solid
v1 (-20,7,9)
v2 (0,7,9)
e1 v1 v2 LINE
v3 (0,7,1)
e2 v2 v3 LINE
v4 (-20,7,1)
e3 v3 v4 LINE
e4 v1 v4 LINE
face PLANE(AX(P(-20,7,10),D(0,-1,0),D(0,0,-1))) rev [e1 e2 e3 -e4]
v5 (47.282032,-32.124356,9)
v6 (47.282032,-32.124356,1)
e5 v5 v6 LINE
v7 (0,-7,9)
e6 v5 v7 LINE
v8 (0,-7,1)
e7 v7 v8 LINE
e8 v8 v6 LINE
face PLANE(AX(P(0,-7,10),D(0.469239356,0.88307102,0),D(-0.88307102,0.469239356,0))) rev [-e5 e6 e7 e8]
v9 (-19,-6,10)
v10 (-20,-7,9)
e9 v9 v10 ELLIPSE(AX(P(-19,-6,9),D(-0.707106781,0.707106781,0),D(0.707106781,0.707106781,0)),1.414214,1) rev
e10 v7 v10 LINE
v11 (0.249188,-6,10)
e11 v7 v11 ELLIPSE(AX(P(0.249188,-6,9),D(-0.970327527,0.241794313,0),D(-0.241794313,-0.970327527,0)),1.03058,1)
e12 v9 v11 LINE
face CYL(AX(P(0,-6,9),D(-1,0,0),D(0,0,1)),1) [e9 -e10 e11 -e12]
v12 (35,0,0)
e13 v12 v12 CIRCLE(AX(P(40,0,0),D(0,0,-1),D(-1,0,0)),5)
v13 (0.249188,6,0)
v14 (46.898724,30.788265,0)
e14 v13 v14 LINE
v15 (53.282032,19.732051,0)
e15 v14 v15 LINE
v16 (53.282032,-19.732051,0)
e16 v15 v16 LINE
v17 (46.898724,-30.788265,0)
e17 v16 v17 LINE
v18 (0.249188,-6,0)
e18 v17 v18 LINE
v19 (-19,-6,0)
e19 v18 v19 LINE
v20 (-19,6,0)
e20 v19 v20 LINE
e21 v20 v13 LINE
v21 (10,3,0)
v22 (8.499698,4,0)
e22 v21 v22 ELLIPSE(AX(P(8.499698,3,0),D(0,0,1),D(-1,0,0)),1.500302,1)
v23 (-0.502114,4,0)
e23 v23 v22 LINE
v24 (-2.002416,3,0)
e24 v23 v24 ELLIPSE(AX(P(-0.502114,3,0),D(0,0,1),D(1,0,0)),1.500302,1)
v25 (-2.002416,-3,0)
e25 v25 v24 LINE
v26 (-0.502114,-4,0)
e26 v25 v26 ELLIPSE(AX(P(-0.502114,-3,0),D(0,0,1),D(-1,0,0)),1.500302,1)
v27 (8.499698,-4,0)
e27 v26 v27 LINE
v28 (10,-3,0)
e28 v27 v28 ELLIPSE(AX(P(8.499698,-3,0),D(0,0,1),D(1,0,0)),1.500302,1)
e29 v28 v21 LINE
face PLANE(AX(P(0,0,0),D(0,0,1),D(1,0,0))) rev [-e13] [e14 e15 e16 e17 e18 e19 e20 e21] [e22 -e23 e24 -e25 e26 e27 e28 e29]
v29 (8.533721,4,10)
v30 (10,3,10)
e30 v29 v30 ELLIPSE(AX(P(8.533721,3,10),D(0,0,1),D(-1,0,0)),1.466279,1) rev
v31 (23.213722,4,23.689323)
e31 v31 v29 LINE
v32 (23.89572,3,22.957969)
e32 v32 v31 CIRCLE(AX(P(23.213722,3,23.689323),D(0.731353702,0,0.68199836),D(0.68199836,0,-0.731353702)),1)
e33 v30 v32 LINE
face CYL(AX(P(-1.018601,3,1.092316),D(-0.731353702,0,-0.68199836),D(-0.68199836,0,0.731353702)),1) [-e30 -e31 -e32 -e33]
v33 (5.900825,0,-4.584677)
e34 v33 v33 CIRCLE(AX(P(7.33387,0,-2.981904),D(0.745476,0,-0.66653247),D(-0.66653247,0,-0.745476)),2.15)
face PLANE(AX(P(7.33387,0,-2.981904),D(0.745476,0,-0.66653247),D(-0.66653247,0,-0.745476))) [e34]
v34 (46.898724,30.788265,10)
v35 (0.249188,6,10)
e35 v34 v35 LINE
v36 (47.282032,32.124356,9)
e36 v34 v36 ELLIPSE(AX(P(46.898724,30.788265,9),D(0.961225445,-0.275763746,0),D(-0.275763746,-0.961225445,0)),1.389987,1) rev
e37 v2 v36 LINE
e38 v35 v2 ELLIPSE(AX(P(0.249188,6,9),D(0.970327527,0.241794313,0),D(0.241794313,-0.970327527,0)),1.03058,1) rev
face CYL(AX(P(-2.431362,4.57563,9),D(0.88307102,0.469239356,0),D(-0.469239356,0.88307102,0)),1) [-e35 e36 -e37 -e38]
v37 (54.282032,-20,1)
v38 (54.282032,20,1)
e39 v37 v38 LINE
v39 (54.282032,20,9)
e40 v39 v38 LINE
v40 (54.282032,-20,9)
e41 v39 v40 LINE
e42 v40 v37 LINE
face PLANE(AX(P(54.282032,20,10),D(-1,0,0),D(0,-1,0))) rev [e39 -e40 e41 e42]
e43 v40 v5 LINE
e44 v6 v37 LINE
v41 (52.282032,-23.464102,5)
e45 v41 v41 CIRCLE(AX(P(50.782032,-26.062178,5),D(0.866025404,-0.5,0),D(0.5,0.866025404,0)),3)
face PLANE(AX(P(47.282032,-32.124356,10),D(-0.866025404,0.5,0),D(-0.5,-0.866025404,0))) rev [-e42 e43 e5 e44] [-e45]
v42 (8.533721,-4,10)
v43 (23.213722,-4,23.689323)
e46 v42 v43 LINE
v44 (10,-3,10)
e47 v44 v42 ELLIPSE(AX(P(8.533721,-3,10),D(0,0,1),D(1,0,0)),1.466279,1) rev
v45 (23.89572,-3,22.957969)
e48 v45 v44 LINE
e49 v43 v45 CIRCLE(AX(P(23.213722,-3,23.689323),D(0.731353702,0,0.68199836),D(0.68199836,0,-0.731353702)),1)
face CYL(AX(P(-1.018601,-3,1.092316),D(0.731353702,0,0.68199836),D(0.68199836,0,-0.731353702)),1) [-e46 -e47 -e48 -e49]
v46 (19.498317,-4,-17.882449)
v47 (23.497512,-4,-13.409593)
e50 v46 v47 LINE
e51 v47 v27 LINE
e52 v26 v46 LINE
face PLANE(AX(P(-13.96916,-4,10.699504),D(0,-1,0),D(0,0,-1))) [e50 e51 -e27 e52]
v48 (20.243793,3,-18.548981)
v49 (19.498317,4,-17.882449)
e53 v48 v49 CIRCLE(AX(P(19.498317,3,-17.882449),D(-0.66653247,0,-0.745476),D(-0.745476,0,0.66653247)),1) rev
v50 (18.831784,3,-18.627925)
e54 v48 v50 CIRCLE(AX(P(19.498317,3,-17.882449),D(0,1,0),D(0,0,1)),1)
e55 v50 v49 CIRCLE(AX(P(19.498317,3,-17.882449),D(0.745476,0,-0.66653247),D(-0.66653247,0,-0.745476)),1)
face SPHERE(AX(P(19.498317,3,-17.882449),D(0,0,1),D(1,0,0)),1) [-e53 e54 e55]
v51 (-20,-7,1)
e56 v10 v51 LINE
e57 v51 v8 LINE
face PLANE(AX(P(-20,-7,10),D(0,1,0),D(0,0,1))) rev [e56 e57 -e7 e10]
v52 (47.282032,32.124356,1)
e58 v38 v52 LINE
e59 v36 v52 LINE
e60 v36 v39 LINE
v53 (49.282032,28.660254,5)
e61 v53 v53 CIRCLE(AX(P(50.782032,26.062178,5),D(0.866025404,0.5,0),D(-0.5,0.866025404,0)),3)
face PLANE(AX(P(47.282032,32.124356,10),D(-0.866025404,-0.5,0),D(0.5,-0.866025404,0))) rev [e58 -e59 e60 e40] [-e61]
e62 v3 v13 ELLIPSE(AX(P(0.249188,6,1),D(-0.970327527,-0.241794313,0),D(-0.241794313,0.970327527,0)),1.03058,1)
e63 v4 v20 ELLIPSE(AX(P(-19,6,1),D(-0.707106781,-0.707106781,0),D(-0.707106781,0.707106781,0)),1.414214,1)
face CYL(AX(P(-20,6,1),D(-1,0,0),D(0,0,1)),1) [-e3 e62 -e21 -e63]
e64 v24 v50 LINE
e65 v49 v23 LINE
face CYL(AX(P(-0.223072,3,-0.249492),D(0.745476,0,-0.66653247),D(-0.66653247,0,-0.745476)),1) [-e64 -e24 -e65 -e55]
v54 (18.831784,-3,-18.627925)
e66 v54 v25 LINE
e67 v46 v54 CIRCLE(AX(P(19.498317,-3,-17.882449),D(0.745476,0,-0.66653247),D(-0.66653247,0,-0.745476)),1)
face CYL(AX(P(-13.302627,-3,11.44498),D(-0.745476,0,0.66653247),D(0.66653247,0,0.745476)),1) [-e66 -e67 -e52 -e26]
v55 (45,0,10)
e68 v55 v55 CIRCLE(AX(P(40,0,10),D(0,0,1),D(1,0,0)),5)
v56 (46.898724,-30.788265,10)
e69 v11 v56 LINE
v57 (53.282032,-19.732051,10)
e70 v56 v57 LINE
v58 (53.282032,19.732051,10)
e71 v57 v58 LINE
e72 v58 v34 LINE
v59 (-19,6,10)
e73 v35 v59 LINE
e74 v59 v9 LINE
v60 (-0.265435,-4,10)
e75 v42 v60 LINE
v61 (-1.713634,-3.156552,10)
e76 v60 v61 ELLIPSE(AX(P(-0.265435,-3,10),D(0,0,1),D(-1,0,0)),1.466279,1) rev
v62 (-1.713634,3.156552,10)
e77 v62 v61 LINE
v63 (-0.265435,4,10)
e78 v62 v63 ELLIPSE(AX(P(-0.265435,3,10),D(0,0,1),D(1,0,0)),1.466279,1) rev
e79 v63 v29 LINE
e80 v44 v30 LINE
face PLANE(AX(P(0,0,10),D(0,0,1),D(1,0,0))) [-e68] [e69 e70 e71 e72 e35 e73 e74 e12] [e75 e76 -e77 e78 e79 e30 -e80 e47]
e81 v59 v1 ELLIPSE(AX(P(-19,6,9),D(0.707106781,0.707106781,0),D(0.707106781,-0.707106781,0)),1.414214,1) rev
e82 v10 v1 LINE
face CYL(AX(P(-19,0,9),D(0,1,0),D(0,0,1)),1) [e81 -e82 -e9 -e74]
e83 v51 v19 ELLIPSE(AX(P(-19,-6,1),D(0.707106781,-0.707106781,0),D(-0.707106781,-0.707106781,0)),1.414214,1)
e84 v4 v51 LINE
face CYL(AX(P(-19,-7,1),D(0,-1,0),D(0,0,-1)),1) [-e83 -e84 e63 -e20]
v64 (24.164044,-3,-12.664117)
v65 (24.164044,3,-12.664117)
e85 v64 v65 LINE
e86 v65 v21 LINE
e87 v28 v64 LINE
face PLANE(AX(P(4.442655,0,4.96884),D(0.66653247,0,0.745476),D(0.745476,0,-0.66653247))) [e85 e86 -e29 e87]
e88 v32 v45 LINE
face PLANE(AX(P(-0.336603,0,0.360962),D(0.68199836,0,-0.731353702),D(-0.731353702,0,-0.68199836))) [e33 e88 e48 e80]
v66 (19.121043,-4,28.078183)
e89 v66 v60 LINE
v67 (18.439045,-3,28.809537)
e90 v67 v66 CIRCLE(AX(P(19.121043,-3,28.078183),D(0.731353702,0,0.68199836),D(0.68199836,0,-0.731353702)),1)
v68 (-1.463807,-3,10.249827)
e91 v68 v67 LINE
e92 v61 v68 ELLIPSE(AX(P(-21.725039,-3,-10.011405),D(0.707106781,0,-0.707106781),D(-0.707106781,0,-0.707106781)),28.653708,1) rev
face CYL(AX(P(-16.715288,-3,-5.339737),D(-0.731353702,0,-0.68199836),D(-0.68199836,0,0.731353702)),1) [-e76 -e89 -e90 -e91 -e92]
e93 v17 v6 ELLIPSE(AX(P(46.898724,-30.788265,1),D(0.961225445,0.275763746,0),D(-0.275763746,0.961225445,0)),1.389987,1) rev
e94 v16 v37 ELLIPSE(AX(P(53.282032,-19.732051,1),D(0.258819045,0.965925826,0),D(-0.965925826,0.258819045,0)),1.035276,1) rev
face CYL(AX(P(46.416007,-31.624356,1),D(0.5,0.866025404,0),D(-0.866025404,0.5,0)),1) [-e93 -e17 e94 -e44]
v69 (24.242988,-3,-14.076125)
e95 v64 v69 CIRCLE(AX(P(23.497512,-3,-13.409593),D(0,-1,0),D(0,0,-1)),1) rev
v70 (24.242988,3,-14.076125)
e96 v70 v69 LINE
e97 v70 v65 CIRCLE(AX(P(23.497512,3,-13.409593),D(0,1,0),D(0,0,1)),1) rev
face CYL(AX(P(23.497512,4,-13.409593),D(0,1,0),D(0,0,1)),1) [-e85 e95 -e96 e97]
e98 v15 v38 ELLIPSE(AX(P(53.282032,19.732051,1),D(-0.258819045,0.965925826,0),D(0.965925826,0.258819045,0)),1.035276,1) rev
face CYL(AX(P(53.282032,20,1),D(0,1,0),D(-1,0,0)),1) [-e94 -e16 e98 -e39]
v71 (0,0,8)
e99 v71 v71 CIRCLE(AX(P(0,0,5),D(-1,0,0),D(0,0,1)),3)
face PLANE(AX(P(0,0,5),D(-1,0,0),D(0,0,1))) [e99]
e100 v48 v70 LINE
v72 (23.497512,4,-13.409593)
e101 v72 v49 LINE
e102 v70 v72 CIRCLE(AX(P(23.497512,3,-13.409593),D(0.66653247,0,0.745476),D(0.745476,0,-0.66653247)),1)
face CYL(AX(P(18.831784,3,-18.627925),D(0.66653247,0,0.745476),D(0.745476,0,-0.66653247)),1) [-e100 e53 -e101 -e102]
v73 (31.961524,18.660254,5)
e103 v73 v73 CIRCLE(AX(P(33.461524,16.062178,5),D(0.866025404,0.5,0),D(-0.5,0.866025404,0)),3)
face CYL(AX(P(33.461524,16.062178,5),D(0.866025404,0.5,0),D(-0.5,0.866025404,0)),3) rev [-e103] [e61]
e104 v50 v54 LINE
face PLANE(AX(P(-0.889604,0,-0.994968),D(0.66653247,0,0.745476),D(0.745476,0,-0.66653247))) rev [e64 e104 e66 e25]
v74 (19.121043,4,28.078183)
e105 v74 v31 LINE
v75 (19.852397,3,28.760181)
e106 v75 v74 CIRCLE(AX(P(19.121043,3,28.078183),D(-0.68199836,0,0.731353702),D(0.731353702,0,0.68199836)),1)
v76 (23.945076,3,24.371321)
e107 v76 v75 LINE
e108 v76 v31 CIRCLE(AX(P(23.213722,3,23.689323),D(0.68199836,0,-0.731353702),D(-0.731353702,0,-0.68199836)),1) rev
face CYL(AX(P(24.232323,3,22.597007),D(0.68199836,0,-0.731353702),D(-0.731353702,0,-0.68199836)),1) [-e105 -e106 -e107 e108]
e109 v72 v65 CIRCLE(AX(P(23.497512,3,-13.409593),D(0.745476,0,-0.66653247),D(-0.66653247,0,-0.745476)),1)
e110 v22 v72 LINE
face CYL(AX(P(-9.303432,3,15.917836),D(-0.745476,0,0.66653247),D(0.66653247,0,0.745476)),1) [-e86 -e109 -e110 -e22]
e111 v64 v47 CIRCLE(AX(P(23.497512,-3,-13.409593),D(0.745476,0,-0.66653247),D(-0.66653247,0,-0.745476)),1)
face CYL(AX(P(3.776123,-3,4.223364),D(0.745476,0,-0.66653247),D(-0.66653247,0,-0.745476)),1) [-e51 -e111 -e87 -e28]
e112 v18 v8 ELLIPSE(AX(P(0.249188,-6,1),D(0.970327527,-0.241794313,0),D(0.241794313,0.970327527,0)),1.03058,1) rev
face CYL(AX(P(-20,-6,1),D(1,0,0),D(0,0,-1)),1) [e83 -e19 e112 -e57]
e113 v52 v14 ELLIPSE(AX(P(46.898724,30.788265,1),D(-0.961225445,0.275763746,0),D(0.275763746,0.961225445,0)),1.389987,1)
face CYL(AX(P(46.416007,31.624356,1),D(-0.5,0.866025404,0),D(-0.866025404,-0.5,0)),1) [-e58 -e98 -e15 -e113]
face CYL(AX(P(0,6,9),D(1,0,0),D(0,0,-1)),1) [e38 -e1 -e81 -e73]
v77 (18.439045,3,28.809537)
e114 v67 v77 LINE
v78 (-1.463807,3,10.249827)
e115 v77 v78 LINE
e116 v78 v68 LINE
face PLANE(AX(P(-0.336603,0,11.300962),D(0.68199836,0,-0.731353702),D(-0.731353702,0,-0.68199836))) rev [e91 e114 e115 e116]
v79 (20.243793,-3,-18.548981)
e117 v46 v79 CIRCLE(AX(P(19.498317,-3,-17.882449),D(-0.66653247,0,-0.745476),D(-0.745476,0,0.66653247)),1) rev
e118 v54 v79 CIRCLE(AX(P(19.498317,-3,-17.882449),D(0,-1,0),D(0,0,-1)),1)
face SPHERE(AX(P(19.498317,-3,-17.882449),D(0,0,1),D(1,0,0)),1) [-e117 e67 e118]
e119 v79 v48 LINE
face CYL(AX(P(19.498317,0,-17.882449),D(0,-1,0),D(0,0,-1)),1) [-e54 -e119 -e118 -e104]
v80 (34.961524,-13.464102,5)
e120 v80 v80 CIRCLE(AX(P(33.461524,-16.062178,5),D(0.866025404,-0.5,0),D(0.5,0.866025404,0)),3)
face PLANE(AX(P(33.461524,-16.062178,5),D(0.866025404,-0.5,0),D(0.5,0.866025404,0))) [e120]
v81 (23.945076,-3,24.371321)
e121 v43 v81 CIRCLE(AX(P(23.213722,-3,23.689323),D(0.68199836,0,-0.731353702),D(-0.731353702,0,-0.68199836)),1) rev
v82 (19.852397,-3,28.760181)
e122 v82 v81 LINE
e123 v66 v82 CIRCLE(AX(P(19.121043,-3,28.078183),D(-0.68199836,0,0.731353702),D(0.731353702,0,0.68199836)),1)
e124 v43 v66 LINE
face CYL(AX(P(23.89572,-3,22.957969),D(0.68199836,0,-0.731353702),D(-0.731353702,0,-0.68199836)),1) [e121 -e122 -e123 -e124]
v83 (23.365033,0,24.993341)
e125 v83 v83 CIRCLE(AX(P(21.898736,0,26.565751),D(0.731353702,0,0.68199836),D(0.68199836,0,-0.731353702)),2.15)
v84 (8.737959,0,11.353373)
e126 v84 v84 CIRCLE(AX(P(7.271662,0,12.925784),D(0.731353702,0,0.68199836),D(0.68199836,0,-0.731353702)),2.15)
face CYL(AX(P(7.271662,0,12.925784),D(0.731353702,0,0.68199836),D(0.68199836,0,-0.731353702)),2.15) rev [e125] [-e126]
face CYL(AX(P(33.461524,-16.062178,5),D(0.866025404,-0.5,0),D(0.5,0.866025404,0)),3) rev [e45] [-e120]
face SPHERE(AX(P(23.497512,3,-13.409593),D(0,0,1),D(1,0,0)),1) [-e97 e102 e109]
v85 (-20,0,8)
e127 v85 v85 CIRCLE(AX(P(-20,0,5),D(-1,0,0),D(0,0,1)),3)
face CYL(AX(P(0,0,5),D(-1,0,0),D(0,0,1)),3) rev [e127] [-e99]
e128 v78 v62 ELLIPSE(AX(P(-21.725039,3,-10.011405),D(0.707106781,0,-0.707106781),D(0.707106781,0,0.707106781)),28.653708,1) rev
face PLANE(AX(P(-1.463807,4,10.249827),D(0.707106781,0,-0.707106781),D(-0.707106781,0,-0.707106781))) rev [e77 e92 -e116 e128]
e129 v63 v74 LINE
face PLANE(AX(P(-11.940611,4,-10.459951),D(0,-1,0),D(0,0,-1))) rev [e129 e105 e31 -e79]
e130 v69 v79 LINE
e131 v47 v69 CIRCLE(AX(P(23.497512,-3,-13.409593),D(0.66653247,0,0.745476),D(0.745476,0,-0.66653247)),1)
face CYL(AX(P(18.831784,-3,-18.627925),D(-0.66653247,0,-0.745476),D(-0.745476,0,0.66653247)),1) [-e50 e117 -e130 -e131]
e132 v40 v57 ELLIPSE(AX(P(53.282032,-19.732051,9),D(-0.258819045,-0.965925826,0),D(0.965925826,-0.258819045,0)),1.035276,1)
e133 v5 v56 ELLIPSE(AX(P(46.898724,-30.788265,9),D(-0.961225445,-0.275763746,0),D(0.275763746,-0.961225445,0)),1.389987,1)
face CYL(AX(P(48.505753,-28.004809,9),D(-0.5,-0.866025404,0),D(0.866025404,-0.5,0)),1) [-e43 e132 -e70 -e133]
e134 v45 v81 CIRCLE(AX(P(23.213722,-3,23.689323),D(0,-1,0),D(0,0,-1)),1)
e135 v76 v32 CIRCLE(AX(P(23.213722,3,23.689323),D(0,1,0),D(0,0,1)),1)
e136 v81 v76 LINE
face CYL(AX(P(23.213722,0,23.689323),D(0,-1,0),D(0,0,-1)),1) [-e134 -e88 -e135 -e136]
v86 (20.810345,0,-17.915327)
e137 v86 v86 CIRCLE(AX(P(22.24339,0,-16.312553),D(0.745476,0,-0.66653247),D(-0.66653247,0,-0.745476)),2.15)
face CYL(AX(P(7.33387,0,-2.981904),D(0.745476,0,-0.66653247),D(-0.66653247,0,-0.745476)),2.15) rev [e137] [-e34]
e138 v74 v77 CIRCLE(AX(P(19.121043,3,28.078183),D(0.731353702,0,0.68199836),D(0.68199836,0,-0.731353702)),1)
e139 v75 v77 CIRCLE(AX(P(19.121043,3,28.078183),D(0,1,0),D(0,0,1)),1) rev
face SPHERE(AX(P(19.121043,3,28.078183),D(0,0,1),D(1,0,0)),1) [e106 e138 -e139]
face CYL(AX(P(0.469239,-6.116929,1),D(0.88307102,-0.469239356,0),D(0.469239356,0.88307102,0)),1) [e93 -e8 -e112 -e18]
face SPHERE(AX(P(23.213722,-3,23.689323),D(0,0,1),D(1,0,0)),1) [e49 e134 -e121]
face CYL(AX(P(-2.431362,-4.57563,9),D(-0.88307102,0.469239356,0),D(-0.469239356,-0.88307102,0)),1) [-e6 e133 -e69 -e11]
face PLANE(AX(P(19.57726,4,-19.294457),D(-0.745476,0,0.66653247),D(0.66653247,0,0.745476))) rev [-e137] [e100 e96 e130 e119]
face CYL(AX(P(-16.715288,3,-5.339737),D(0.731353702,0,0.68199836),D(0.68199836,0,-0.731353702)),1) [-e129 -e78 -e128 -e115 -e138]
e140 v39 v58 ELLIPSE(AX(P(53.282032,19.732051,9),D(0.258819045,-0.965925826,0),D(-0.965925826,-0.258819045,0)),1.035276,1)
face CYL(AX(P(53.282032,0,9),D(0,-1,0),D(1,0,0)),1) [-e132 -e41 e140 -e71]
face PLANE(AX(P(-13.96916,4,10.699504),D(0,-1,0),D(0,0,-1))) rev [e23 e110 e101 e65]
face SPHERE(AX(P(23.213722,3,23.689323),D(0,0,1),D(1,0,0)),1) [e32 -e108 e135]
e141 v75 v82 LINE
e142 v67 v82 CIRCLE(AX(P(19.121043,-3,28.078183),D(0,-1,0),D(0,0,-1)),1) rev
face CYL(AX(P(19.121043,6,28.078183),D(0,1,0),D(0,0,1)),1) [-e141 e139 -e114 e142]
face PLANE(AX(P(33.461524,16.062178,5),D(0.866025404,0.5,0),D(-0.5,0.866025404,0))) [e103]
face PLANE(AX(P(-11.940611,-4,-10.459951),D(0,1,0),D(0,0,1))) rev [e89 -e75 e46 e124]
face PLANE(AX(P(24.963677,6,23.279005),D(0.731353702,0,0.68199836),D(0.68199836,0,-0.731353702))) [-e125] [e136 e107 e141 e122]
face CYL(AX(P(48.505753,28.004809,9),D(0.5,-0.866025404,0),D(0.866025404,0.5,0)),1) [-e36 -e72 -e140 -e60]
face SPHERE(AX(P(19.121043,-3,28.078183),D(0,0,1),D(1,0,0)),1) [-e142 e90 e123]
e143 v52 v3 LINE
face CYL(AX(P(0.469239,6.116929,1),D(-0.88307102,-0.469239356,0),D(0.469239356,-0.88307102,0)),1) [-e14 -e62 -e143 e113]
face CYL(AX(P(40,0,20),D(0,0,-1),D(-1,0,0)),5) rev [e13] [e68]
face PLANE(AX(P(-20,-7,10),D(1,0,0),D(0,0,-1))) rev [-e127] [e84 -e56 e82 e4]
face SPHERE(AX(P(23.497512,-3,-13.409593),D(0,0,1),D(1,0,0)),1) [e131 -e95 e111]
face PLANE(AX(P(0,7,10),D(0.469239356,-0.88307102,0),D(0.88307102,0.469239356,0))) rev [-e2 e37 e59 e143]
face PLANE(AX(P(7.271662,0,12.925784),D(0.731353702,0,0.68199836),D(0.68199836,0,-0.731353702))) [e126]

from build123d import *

# Parameters (mm, degrees)
BOSS_EXTRU_2_DEPTH       = 10
ESQUISSE6_R              = 3
ENL_V_MAT_EXTRU_4_DEPTH  = 20
ESQUISSE7_R              = 3
ENL_V_MAT_EXTRU_5_DEPTH  = 20
ESQUISSE8_R              = 5
ENL_V_MAT_EXTRU_6_DEPTH  = 20
BOSS_EXTRU_3_DEPTH       = 10.94
ENL_V_MAT_EXTRU_9_DEPTH  = 10
ESQUISSE14_W             = 21.055359181
ESQUISSE14_H             = 15.627906255
ENL_V_MAT_EXTRU_10_DEPTH = 10
ESQUISSE15_R             = 2.15
ENL_V_MAT_EXTRU_11_DEPTH = 20
ESQUISSE19_W             = 45
ESQUISSE19_H             = 8
BOSS_EXTRU_6_DEPTH       = 8
ENL_V_MAT_EXTRU_13_DEPTH = 8
ESQUISSE21_R             = 2.15
ENL_V_MAT_EXTRU_14_DEPTH = 20
ESQUISSE4_R              = 3
ENL_V_MAT_EXTRU_3_DEPTH  = 20
CONG_1_R                 = 1
CONG_2_R                 = 1


with BuildPart() as part:
    # Esquisse1 → Boss.-Extru.2 (new body)
    with BuildSketch(Plane.XY):
        Polygon((-20, -7), (-20, 7), (0, 7), (47.282032303, 32.124355653), (54.282032303, 20), (54.282032303, -20), (47.282032303, -32.124355653), (0, -7), align=None)
    extrude(amount=BOSS_EXTRU_2_DEPTH)

    # Esquisse6 → Enlèv. mat.-Extru.4 (cut)
    with BuildSketch(Plane(origin=(49.371778265, 28.504809472, 0), x_dir=(0.4999999999999953, -0.8660254037844415, 0), z_dir=(0.8660254037844415, 0.4999999999999953, 0))):
        with Locations(Location((2.820508076, -5, 0), (0, 0, 180))):
            Circle(ESQUISSE6_R)
    extrude(amount=-ENL_V_MAT_EXTRU_4_DEPTH, mode=Mode.SUBTRACT)

    # Esquisse7 → Enlèv. mat.-Extru.5 (cut)
    with BuildSketch(Plane(origin=(49.371778265, -28.504809472, 0), x_dir=(-0.5000000000000256, -0.8660254037844237, 0), z_dir=(0.8660254037844238, -0.5000000000000258, 0))):
        with Locations(Location((-2.820508076, -5, 0), (0, 0, 180))):
            Circle(ESQUISSE7_R)
    extrude(amount=-ENL_V_MAT_EXTRU_5_DEPTH, mode=Mode.SUBTRACT)

    # Esquisse8 → Enlèv. mat.-Extru.6 (cut)
    with BuildSketch(Plane(origin=(0, 0, 0), x_dir=(-1, 0, 0), z_dir=(0, 0, -1))):
        with Locations((-40, 0)):
            Circle(ESQUISSE8_R)
    extrude(amount=-ENL_V_MAT_EXTRU_6_DEPTH, mode=Mode.SUBTRACT)

    # Esquisse3D2 → Boss.-Extru.3 (add, along a direction that is not the sketch's normal)
    with BuildSketch(Plane(origin=(-11.940611049, 4, -10.459950802), x_dir=(0.7221683612814543, -0.15799050110667315, 0.6734328916262713), z_dir=(-0.6819983600624996, 0, 0.7313537016191696))):
        Polygon((0, 0), (49.372031596, 7.899525055), (50.635955605, 0), (1.263924009, -7.899525055), align=None)
    extrude(amount=BOSS_EXTRU_3_DEPTH, dir=(0, 0, 1))

    # Esquisse11 → Enlèv. mat.-Extru.9 (cut)
    with BuildSketch(Plane(origin=(0, -4, 0), x_dir=(-1, 0, 0), z_dir=(0, -1, 0))):
        Polygon((-19.170398677, -29.491535113), (-24.627074032, -23.639967201), (-24.627074032, -34.579967201), (-21.088649198, -31.280332662), align=None)
    extrude(amount=-ENL_V_MAT_EXTRU_9_DEPTH, mode=Mode.SUBTRACT)

    # Esquisse14 → Enlèv. mat.-Extru.10 (cut)
    with BuildSketch(Plane(origin=(0, -4, 0), x_dir=(-1, 0, 0), z_dir=(0, -1, 0))):
        with Locations((1.412931459, 7.813953128)):
            Rectangle(ESQUISSE14_W, ESQUISSE14_H)
    extrude(amount=-ENL_V_MAT_EXTRU_10_DEPTH, mode=Mode.SUBTRACT)

    # Esquisse15 → Enlèv. mat.-Extru.11 (cut)
    with BuildSketch(Plane(origin=(24.963676652, 0, 23.279005084), x_dir=(0.6819983600624997, 0, -0.7313537016191695), z_dir=(0.7313537016191695, 0, 0.6819983600624997))):
        with Locations((-4.494058163, 0)):
            Circle(ESQUISSE15_R)
    extrude(amount=-ENL_V_MAT_EXTRU_11_DEPTH, mode=Mode.SUBTRACT)

    # Esquisse19 → Boss.-Extru.6 (add)
    with BuildSketch(Plane(origin=(4.442655339, 0, 4.968839596), x_dir=(-0.7454759996828609, 0, 0.6665324702494538), z_dir=(-0.6665324702494538, 0, -0.7454759996828609))):
        with Locations((-4.954759997, 0)):
            Rectangle(ESQUISSE19_W, ESQUISSE19_H)
    extrude(amount=BOSS_EXTRU_6_DEPTH)

    # Esquisse20 → Enlèv. mat.-Extru.13 (cut)
    with BuildSketch(Plane(origin=(0, -4, 0), x_dir=(-1, 0, 0), z_dir=(0, -1, 0))):
        Polygon((8.636899992, -16.663311756), (13.969159754, -10.699503759), (13.186807375, -10), (1.71363405, -10), (1.463807332, -10.249826718), align=None)
    extrude(amount=-ENL_V_MAT_EXTRU_13_DEPTH, mode=Mode.SUBTRACT)

    # Esquisse21 → Enlèv. mat.-Extru.14 (cut)
    with BuildSketch(Plane(origin=(20.466864655, 0, -18.299489001), x_dir=(-0.6665324702494541, 0, -0.7454759996828608), z_dir=(0.7454759996828608, 0, -0.6665324702494541))):
        with Locations((-2.665324702, 0)):
            Circle(ESQUISSE21_R)
    extrude(amount=-ENL_V_MAT_EXTRU_14_DEPTH, mode=Mode.SUBTRACT)

    # Esquisse4 → Enlèv. mat.-Extru.3 (cut)
    with BuildSketch(Plane.ZY.offset(20)):
        with Locations((5, 0)):
            Circle(ESQUISSE4_R)
    extrude(amount=-ENL_V_MAT_EXTRU_3_DEPTH, mode=Mode.SUBTRACT)

    # Congé1
    # the kernel refuses this fillet: 1 mm, written as the material it takes off along each edge
    with BuildSketch(Plane(origin=(23.497511524, 3, -13.409592934), x_dir=(0, 1, 0), z_dir=(0.666532470249454, 0, 0.745475999682861))) as cong_1_piece_1_section:
        Polygon((0, 0), (CONG_1_R, 0), (CONG_1_R, -CONG_1_R), (0, -CONG_1_R), align=None)
    cong_1_piece_1 = extrude(amount=CONG_1_R, mode=Mode.PRIVATE)
    cong_1_piece_1 = cong_1_piece_1 - Plane(origin=(23.497511524, 3, -13.409592934), x_dir=(-0.5271311345875715, -0.7071067811865474, 0.4713096295944097), z_dir=(0.666532470249454, 0, 0.745475999682861)) * Sphere(CONG_1_R, mode=Mode.PRIVATE)
    add(cong_1_piece_1, mode=Mode.SUBTRACT)
    with BuildSketch(Plane(origin=(23.497511524, -3, -13.409592934), x_dir=(0, -1, 0), z_dir=(0.666532470249454, 0, 0.745475999682861))) as cong_1_piece_2_section:
        Polygon((0, 0), (CONG_1_R, 0), (CONG_1_R, CONG_1_R), (0, CONG_1_R), align=None)
    cong_1_piece_2 = extrude(amount=CONG_1_R, mode=Mode.PRIVATE)
    cong_1_piece_2 = cong_1_piece_2 - Plane(origin=(23.497511524, -3, -13.409592934), x_dir=(-0.5271311345875714, 0.7071067811865476, 0.4713096295944094), z_dir=(0.666532470249454, 0, 0.745475999682861)) * Sphere(CONG_1_R, mode=Mode.PRIVATE)
    add(cong_1_piece_2, mode=Mode.SUBTRACT)
    with BuildSketch(Plane(origin=(19.498316702, 3, -17.882448933), x_dir=(-0.666532470249454, 0, -0.745475999682861), z_dir=(0.7454759996828609, 0, -0.6665324702494538))) as cong_1_piece_3_section:
        Polygon((0, 0), (CONG_1_R, 0), (CONG_1_R, CONG_1_R), (0, CONG_1_R), align=None)
    cong_1_piece_3 = extrude(amount=CONG_1_R, mode=Mode.PRIVATE)
    cong_1_piece_3 = cong_1_piece_3 - Plane(origin=(19.498316702, 3, -17.882448933), x_dir=(0.47130962959440953, -0.7071067811865474, 0.5271311345875718), z_dir=(0.7454759996828609, 0, -0.6665324702494538)) * Sphere(CONG_1_R, mode=Mode.PRIVATE)
    add(cong_1_piece_3, mode=Mode.SUBTRACT)
    with BuildSketch(Plane(origin=(19.498316702, -3, -17.882448933), x_dir=(-0.666532470249454, 0, -0.745475999682861), z_dir=(0, -1, 0))) as cong_1_piece_4_section:
        Polygon((0, 0), (CONG_1_R, 0), (CONG_1_R, CONG_1_R), (0, CONG_1_R), align=None)
    cong_1_piece_4 = extrude(amount=CONG_1_R, mode=Mode.PRIVATE)
    cong_1_piece_4 = cong_1_piece_4 - Plane(origin=(19.498316702, -3, -17.882448933), x_dir=(-0.05582150499316189, 0, 0.9984407641819811), z_dir=(0, -1, 0)) * Sphere(CONG_1_R, mode=Mode.PRIVATE)
    add(cong_1_piece_4, mode=Mode.SUBTRACT)
    with BuildSketch(Plane(origin=(19.121043336, -3, 28.078183051), x_dir=(-0.6819983600624996, 0, 0.7313537016191696), z_dir=(0.7313537016191692, 0, 0.6819983600624999))) as cong_1_piece_5_section:
        Polygon((0, 0), (CONG_1_R, 0), (CONG_1_R, CONG_1_R), (0, CONG_1_R), align=None)
    cong_1_piece_5 = extrude(amount=CONG_1_R, mode=Mode.PRIVATE)
    cong_1_piece_5 = cong_1_piece_5 - Plane(origin=(19.121043336, -3, 28.078183051), x_dir=(0.482245665158298, 0.7071067811865476, -0.5171451618607975), z_dir=(0.7313537016191692, 0, 0.6819983600624999)) * Sphere(CONG_1_R, mode=Mode.PRIVATE)
    add(cong_1_piece_5, mode=Mode.SUBTRACT)
    with BuildSketch(Plane(origin=(19.121043336, 3, 28.078183051), x_dir=(-0.6819983600624996, 0, 0.7313537016191696), z_dir=(0.7313537016191692, 0, 0.6819983600624999))) as cong_1_piece_6_section:
        Polygon((0, 0), (CONG_1_R, 0), (CONG_1_R, -CONG_1_R), (0, -CONG_1_R), align=None)
    cong_1_piece_6 = extrude(amount=CONG_1_R, mode=Mode.PRIVATE)
    cong_1_piece_6 = cong_1_piece_6 - Plane(origin=(19.121043336, 3, 28.078183051), x_dir=(0.4822456651582982, -0.7071067811865472, -0.5171451618607977), z_dir=(0.7313537016191692, 0, 0.6819983600624999)) * Sphere(CONG_1_R, mode=Mode.PRIVATE)
    add(cong_1_piece_6, mode=Mode.SUBTRACT)
    with BuildSketch(Plane(origin=(23.213721971, -3, 23.689322543), x_dir=(0.6819983600624996, 0, -0.7313537016191696), z_dir=(0.7313537016191692, 0, 0.6819983600624999))) as cong_1_piece_7_section:
        Polygon((0, 0), (CONG_1_R, 0), (CONG_1_R, -CONG_1_R), (0, -CONG_1_R), align=None)
    cong_1_piece_7 = extrude(amount=CONG_1_R, mode=Mode.PRIVATE)
    cong_1_piece_7 = cong_1_piece_7 - Plane(origin=(23.213721971, -3, 23.689322543), x_dir=(-0.4822456651582982, 0.7071067811865472, 0.5171451618607977), z_dir=(0.7313537016191692, 0, 0.6819983600624999)) * Sphere(CONG_1_R, mode=Mode.PRIVATE)
    add(cong_1_piece_7, mode=Mode.SUBTRACT)
    with BuildSketch(Plane(origin=(23.213721971, 3, 23.689322543), x_dir=(0.7313537016191692, 0, 0.6819983600624999), z_dir=(0.6819983600624996, 0, -0.7313537016191696))) as cong_1_piece_8_section:
        Polygon((0, 0), (CONG_1_R, 0), (CONG_1_R, -CONG_1_R), (0, -CONG_1_R), align=None)
    cong_1_piece_8 = extrude(amount=CONG_1_R, mode=Mode.PRIVATE)
    cong_1_piece_8 = cong_1_piece_8 - Plane(origin=(23.213721971, 3, 23.689322543), x_dir=(-0.5171451618607974, -0.7071067811865475, -0.48224566515829836), z_dir=(0.6819983600624996, 0, -0.7313537016191696)) * Sphere(CONG_1_R, mode=Mode.PRIVATE)
    add(cong_1_piece_8, mode=Mode.SUBTRACT)
    with BuildSketch(Plane(origin=(24.909519994, 3, -13.330649405), x_dir=(-0.7454759996828614, 0, 0.6665324702494536), z_dir=(0, -1, 0)), Plane(origin=(24.242987523, -4, -14.076125405), x_dir=(-0.7454759996828609, 0, 0.666532470249454), z_dir=(-0.666532470249454, 0, -0.745475999682861)), Plane(origin=(19.170398677, -3, 29.491535113), x_dir=(0.6819983600624999, 0, -0.7313537016191692), z_dir=(0, 1, 0))) as cong_1_piece_9:
        with BuildLine():
            CenterArc((CONG_1_R, CONG_1_R), CONG_1_R, 180, 90)
            Line((0, CONG_1_R), (0, 0))
            Line((0, 0), (CONG_1_R, 0))
        make_face()
    extrude(amount=6, mode=Mode.SUBTRACT)
    with BuildSketch(Plane(origin=(24.242987523, 4, -14.076125405), x_dir=(-0.745475999682861, 0, 0.6665324702494538), z_dir=(-0.666532470249454, 0, -0.745475999682861)), Plane(origin=(19.577260232, 3, -19.294457402), x_dir=(-0.7454759996828622, 0, 0.6665324702494525), z_dir=(0, -1, 0)), Plane(origin=(24.627074032, 3, 23.639967201), x_dir=(-0.7313537016191676, 0, -0.6819983600625017), z_dir=(0, -1, 0))) as cong_1_piece_10:
        with BuildLine():
            CenterArc((CONG_1_R, -CONG_1_R), CONG_1_R, 90, 90)
            Line((0, -CONG_1_R), (0, 0))
            Line((0, 0), (CONG_1_R, 0))
        make_face()
    extrude(amount=6, mode=Mode.SUBTRACT)
    with BuildSketch(Plane(origin=(19.852397038, -4, 28.760181411), x_dir=(-0.7313537016191692, 0, -0.6819983600624998), z_dir=(0.6819983600624999, 0, -0.7313537016191692)), Plane(origin=(23.945075672, 4, 24.371320903), x_dir=(-0.7313537016191692, 0, -0.6819983600624999), z_dir=(-0.6819983600624999, 0, 0.7313537016191692))) as cong_1_piece_11:
        with BuildLine():
            CenterArc((CONG_1_R, CONG_1_R), CONG_1_R, 180, 90)
            Line((0, CONG_1_R), (0, 0))
            Line((0, 0), (CONG_1_R, 0))
        make_face()
    extrude(amount=6.001009496, mode=Mode.SUBTRACT)
    with BuildSketch(Plane(origin=(23.895720331, -4, 22.957968841), x_dir=(0, 1, 0), z_dir=(-0.7313537016191696, 0, -0.6819983600624996))) as cong_1_piece_12_section:
        with BuildLine():
            CenterArc((CONG_1_R, -CONG_1_R), CONG_1_R, 90, 90)
            Line((0, -CONG_1_R), (0, 0))
            Line((0, 0), (CONG_1_R, 0))
        make_face()
    cong_1_piece_12 = extrude(amount=21.5, mode=Mode.PRIVATE)
    cong_1_piece_12 = split(cong_1_piece_12, bisect_by=Plane(origin=(16.701898304, -3.775135003, 10), z_dir=(0, 0, 1)), keep=Keep.TOP, mode=Mode.PRIVATE)
    add(cong_1_piece_12, mode=Mode.SUBTRACT)
    with BuildSketch(Plane(origin=(18.439044976, -4, 28.809536753), x_dir=(0.6819983600624996, -1.776356839400248e-15, -0.7313537016191696), z_dir=(-0.7313537016191696, 0, -0.6819983600624996))) as cong_1_piece_13_section:
        with BuildLine():
            CenterArc((CONG_1_R, -CONG_1_R), CONG_1_R, 90, 90)
            Line((0, -CONG_1_R), (0, 0))
            Line((0, 0), (CONG_1_R, 0))
        make_face()
    cong_1_piece_13 = extrude(amount=29.713716515, mode=Mode.PRIVATE)
    cong_1_piece_13 = split(cong_1_piece_13, bisect_by=Plane(origin=(8.594887091, -3.772527831, 10), z_dir=(0, 0, 1)), keep=Keep.TOP, mode=Mode.PRIVATE)
    add(cong_1_piece_13, mode=Mode.SUBTRACT)
    with BuildSketch(Plane(origin=(-3.292191586, 4, 8.544830818), x_dir=(0.6819983600624996, 0, -0.7313537016191696), z_dir=(0.7313537016191696, 0, 0.6819983600624996))) as cong_1_piece_14_section:
        with BuildLine():
            CenterArc((CONG_1_R, -CONG_1_R), CONG_1_R, 90, 90)
            Line((0, -CONG_1_R), (0, 0))
            Line((0, 0), (CONG_1_R, 0))
        make_face()
    cong_1_piece_14 = extrude(amount=29.713716515, mode=Mode.PRIVATE)
    cong_1_piece_14 = split(cong_1_piece_14, bisect_by=Plane(origin=(8.594887091, 3.772527831, 10), z_dir=(0, 0, 1)), keep=Keep.TOP, mode=Mode.PRIVATE)
    add(cong_1_piece_14, mode=Mode.SUBTRACT)
    with BuildSketch(Plane(origin=(8.171615746, 4, 8.2950041), x_dir=(0, -1, 0), z_dir=(0.7313537016191696, 0, 0.6819983600624996))) as cong_1_piece_15_section:
        with BuildLine():
            CenterArc((CONG_1_R, -CONG_1_R), CONG_1_R, 90, 90)
            Line((0, -CONG_1_R), (0, 0))
            Line((0, 0), (CONG_1_R, 0))
        make_face()
    cong_1_piece_15 = extrude(amount=21.5, mode=Mode.PRIVATE)
    cong_1_piece_15 = split(cong_1_piece_15, bisect_by=Plane(origin=(16.701898304, 3.775135003, 10), z_dir=(0, 0, 1)), keep=Keep.TOP, mode=Mode.PRIVATE)
    add(cong_1_piece_15, mode=Mode.SUBTRACT)
    with BuildSketch(Plane(origin=(24.164043994, -4, -12.664116935), x_dir=(0, 1, 0), z_dir=(-0.7454759996828609, 0, 0.6665324702494538))) as cong_1_piece_16_section:
        with BuildLine():
            CenterArc((CONG_1_R, CONG_1_R), CONG_1_R, 180, 90)
            Line((0, CONG_1_R), (0, 0))
            Line((0, 0), (CONG_1_R, 0))
        make_face()
    cong_1_piece_16 = extrude(amount=21.5, mode=Mode.PRIVATE)
    cong_1_piece_16 = split(cong_1_piece_16, bisect_by=Plane(origin=(16.833816535, -3.775199875, 0), z_dir=(0, 0, -1)), keep=Keep.TOP, mode=Mode.PRIVATE)
    add(cong_1_piece_16, mode=Mode.SUBTRACT)
    with BuildSketch(Plane(origin=(8.136310001, 4, 1.666331176), x_dir=(0, -1, 0), z_dir=(0.7454759996828609, 0, -0.6665324702494538))) as cong_1_piece_17_section:
        with BuildLine():
            CenterArc((CONG_1_R, CONG_1_R), CONG_1_R, 180, 90)
            Line((0, CONG_1_R), (0, 0))
            Line((0, 0), (CONG_1_R, 0))
        make_face()
    cong_1_piece_17 = extrude(amount=21.5, mode=Mode.PRIVATE)
    cong_1_piece_17 = split(cong_1_piece_17, bisect_by=Plane(origin=(16.833816535, 3.775199875, 0), z_dir=(0, 0, -1)), keep=Keep.TOP, mode=Mode.PRIVATE)
    add(cong_1_piece_17, mode=Mode.SUBTRACT)
    with BuildSketch(Plane(origin=(-3.866106021, 4, 1.666331176), x_dir=(0, -1, 0), z_dir=(0.7454759996828609, 0, -0.6665324702494538))) as cong_1_piece_18_section:
        with BuildLine():
            CenterArc((CONG_1_R, -CONG_1_R), CONG_1_R, 90, 90)
            Line((0, -CONG_1_R), (0, 0))
            Line((0, 0), (CONG_1_R, 0))
        make_face()
    cong_1_piece_18 = extrude(amount=30.447513082, mode=Mode.PRIVATE)
    cong_1_piece_18 = split(cong_1_piece_18, bisect_by=Plane(origin=(8.657930936, 3.772496042, 0), z_dir=(0, 0, -1)), keep=Keep.TOP, mode=Mode.PRIVATE)
    add(cong_1_piece_18, mode=Mode.SUBTRACT)
    with BuildSketch(Plane(origin=(18.831784232, -4, -18.627924932), x_dir=(0.6665324702494538, 0, 0.745475999682861), z_dir=(-0.7454759996828609, 0, 0.6665324702494538))) as cong_1_piece_19_section:
        with BuildLine():
            CenterArc((CONG_1_R, CONG_1_R), CONG_1_R, 180, 90)
            Line((0, CONG_1_R), (0, 0))
            Line((0, 0), (CONG_1_R, 0))
        make_face()
    cong_1_piece_19 = extrude(amount=30.447513082, mode=Mode.PRIVATE)
    cong_1_piece_19 = split(cong_1_piece_19, bisect_by=Plane(origin=(8.657930936, -3.772496042, 0), z_dir=(0, 0, -1)), keep=Keep.TOP, mode=Mode.PRIVATE)
    add(cong_1_piece_19, mode=Mode.SUBTRACT)

    # Congé2
    cong_2_edges = [part.edges().sort_by_distance(p)[0] for p in [
        (-10, 7, 10),
        (23.641016151, 19.562177826, 0),
        (50.782032303, 26.062177826, 0),
        (-20, 0, 10),
        (-10, -7, 10),
        (23.641016151, -19.562177826, 10),
        (50.782032303, -26.062177826, 10),
        (54.282032303, 0, 10),
        (50.782032303, 26.062177826, 10),
        (23.641016151, 19.562177826, 10),
        (54.282032303, 0, 0),
        (50.782032303, -26.062177826, 0),
        (23.641016151, -19.562177826, 0),
        (-10, -7, 0),
        (-20, 0, 0),
        (-10, 7, 0),
    ]]
    fillet(cong_2_edges, radius=CONG_2_R)


solid = part.part
